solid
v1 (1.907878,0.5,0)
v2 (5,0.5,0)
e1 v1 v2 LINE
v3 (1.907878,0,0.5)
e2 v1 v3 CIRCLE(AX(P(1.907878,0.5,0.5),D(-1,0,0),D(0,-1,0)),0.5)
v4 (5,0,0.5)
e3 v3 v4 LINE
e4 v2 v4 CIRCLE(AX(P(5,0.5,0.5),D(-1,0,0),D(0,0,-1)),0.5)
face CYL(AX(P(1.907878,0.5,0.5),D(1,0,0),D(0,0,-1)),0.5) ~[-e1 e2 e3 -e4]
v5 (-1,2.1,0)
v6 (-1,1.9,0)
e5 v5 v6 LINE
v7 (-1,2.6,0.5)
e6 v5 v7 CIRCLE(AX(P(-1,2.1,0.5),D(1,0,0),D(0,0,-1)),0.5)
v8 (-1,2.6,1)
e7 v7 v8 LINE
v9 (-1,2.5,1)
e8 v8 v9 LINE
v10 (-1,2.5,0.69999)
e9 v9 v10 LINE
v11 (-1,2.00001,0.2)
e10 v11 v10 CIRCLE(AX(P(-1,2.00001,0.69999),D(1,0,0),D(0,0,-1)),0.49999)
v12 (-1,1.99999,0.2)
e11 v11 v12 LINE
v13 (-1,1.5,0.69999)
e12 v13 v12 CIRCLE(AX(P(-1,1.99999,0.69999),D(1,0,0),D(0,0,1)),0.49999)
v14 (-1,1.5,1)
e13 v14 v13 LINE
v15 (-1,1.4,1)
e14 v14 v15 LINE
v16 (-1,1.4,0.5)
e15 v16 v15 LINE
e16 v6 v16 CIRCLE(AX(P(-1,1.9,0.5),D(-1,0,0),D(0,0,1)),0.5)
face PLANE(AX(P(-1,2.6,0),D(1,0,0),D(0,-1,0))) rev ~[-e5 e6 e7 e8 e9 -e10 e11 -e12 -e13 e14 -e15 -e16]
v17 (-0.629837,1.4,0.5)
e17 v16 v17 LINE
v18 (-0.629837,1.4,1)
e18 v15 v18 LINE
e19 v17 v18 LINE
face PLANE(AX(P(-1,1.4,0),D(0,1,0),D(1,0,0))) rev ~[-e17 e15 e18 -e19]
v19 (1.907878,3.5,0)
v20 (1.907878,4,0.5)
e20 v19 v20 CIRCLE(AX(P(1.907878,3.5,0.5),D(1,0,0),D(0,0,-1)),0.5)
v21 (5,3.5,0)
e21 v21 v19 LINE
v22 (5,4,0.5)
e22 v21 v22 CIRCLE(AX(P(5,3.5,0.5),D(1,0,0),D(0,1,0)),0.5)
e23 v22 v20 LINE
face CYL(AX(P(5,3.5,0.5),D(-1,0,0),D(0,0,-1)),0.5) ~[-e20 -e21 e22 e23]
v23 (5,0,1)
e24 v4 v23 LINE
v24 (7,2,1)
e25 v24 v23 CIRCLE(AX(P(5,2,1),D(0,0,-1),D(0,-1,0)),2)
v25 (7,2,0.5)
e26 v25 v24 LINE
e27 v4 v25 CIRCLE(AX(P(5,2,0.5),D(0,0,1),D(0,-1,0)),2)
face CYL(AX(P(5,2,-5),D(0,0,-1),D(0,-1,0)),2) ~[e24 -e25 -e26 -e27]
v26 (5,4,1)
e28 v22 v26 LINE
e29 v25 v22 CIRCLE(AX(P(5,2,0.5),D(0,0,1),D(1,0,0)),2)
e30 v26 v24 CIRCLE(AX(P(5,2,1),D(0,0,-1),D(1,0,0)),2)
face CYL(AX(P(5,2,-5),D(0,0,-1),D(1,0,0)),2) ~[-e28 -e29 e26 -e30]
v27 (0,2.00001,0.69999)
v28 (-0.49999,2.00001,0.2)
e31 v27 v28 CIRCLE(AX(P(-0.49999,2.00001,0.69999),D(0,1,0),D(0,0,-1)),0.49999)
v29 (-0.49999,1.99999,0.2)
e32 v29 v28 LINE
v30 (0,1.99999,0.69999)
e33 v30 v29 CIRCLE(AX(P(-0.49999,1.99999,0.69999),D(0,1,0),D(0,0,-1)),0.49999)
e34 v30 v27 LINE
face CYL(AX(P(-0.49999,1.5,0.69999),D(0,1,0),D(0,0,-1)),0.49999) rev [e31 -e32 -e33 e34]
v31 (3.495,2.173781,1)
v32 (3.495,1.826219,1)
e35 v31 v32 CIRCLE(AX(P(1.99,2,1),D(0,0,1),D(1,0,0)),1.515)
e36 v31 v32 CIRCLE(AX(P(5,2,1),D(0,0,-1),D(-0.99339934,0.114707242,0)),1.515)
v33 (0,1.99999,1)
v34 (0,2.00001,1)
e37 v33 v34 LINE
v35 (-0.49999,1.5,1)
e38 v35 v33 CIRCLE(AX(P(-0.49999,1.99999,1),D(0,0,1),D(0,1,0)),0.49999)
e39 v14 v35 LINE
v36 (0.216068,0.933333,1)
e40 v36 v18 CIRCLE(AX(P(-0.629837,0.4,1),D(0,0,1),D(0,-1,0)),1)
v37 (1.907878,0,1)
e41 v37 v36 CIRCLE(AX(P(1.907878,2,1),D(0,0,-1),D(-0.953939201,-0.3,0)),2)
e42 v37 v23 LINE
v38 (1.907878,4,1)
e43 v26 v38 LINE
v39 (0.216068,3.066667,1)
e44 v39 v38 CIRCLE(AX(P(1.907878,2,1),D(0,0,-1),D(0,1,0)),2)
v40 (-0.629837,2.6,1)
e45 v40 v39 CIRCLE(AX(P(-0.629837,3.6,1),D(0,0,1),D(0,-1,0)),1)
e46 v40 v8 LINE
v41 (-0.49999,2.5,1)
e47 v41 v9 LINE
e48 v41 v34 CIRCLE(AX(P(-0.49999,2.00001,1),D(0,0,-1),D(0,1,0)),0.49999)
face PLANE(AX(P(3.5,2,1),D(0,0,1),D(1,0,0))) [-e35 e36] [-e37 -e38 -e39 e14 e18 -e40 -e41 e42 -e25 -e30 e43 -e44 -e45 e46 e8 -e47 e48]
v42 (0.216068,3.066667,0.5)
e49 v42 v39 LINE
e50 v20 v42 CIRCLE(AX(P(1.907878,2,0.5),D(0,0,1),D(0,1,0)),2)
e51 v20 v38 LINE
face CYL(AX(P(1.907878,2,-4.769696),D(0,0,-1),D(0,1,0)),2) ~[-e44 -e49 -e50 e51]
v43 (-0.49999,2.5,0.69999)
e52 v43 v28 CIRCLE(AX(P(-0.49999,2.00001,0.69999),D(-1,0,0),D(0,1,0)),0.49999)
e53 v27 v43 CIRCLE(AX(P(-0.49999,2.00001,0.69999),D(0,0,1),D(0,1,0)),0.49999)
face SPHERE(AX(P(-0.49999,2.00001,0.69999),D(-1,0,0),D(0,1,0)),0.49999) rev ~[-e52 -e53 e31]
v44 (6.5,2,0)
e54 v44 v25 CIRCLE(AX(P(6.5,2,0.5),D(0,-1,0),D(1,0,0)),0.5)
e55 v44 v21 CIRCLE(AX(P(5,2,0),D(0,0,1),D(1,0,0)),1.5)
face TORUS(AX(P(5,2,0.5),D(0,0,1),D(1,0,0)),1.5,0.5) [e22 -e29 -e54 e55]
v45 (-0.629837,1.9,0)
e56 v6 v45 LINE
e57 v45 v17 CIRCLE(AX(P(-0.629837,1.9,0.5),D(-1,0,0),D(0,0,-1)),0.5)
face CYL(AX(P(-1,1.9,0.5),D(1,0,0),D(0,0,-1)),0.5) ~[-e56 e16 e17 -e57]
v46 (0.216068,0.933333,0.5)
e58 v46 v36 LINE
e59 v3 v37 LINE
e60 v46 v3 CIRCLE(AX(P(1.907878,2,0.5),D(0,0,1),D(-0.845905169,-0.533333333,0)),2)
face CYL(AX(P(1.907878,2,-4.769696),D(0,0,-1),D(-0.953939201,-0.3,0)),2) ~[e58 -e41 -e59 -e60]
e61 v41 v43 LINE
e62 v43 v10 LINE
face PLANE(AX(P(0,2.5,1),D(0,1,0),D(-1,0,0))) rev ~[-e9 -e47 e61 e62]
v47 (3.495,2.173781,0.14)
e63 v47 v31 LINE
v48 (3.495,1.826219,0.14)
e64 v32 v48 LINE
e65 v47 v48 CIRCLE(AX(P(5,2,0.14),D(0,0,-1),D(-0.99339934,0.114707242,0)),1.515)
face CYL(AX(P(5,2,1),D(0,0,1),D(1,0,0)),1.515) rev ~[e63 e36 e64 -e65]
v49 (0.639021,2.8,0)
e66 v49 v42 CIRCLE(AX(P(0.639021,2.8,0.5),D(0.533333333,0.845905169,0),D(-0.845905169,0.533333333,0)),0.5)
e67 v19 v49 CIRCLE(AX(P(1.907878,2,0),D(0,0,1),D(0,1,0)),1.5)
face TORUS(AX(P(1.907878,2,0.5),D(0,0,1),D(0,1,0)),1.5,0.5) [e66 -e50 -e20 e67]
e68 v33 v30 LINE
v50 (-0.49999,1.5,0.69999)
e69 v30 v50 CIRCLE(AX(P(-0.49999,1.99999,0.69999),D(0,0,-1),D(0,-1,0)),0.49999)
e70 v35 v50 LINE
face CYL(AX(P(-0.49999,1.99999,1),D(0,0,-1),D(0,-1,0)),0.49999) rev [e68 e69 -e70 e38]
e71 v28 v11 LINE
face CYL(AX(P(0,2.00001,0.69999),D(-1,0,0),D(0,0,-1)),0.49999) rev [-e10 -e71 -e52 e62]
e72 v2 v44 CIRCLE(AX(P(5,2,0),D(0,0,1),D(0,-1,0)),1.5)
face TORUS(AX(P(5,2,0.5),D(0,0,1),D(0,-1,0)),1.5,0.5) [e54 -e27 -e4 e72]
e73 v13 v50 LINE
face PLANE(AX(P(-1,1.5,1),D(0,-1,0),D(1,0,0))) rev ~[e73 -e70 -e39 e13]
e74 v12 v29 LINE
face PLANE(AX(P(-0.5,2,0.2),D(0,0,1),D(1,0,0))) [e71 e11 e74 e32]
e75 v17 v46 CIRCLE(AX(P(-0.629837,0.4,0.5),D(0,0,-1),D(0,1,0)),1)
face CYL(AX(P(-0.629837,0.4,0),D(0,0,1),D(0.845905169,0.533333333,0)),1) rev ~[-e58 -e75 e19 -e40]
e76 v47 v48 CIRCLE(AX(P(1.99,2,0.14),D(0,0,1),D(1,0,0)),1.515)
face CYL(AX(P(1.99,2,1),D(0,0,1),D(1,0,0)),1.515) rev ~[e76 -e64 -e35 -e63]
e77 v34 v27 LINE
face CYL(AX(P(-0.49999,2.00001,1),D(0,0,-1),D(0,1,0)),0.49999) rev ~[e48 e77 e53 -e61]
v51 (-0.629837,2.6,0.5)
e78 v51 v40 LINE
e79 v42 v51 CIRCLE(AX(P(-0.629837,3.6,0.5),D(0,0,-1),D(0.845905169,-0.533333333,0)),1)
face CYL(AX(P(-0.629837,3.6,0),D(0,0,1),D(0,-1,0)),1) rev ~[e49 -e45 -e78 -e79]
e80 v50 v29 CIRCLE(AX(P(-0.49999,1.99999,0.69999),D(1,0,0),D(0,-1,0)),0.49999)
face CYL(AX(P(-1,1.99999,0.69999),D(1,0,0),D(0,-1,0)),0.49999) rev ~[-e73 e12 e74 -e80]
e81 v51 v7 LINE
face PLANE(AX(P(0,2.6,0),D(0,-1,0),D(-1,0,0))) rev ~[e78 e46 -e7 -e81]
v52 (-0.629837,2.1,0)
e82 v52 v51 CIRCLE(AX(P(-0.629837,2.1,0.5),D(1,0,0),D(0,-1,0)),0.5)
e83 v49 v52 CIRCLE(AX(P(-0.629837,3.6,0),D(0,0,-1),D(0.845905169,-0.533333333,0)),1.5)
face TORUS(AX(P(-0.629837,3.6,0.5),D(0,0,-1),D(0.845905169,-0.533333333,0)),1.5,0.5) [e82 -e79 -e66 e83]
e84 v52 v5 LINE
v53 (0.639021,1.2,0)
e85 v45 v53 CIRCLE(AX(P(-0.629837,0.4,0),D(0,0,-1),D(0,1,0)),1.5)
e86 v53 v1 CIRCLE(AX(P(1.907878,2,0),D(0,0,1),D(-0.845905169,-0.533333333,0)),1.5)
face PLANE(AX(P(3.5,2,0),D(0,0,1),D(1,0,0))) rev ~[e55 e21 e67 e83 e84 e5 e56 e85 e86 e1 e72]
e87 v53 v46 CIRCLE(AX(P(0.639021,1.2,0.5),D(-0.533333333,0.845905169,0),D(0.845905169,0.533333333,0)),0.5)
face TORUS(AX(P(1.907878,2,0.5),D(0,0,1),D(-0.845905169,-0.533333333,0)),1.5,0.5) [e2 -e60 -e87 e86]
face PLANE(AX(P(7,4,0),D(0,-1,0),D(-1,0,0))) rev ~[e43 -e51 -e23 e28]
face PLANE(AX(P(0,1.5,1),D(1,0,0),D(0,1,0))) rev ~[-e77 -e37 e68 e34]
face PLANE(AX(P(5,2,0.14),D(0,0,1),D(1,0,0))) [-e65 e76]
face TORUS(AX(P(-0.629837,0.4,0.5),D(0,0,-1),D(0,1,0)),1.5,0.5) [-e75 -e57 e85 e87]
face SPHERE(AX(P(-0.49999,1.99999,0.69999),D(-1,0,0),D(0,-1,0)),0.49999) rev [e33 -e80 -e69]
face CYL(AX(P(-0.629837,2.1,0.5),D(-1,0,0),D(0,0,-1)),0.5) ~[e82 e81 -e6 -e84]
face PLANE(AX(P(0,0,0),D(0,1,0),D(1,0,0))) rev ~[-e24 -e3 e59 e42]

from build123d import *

# Parameters (mm, degrees)
F1_DEPTH    = 1
F2_R        = 1.515
F3_DEPTH    = 0.86
F4_R        = 1.515
F5_DEPTH    = 0.86
F6_DEPTH    = 0.6
F8_DEPTH    = 0.8
F9_T1_DEPTH = 10.5393920142
F9_T3_DEPTH = 11
F10_R       = 1
F11_R       = 0.49999
F12_R       = 0.5


# Not quite as in the source:
# - a fillet or chamfer that OpenCascade refuses, or shapes differently, is made with other operations: its cross-section is extruded or revolved along the edge and cut away or added
# - a fillet or chamfer is up to 0.001 mm smaller than in the source, because OpenCascade refuses the exact size


with BuildPart() as f1:
    # F0 (on Top) → F1 (new body)
    with BuildSketch(Plane.XY):
        Polygon((0, 1.4), (0, 0), (7, 0), (7, 4), (0, 4), (0, 2.6), (0, 2), align=None)
        Polygon((-1, 1.4), (0, 1.4), (0, 2), (0, 2.6), (-1, 2.6), align=None)
    extrude(amount=F1_DEPTH)

    # F2 (on face) → F3 (cut)
    with BuildSketch(Plane.XY.offset(1)):
        with Locations((5, 2)):
            Circle(F2_R)
    extrude(amount=-F3_DEPTH, mode=Mode.SUBTRACT)

    # F4 (on face) → F5 (cut)
    with BuildSketch(Plane.XY.offset(1)):
        with Locations((1.99, 2)):
            Circle(F4_R)
    extrude(amount=-F5_DEPTH, mode=Mode.SUBTRACT)

    # F4 (on face) → F6 (cut)
    with BuildSketch(Plane.XY.offset(1)):
        with Locations((1.99, 2)):
            Circle(F4_R)
    extrude(amount=-F6_DEPTH, mode=Mode.SUBTRACT)

    # F7 (on face) → F8 (cut)
    with BuildSketch(Plane.XY.offset(1)):
        Polygon((-1, 2.5), (-1, 2), (-1, 1.5), (0, 1.5), (0, 2.5), align=None)
    extrude(amount=-F8_DEPTH, mode=Mode.SUBTRACT)

    # F9: fillet of radius 2 on 4 edges, made by hand

    # F9_s2 → F9_t1 (cut)
    with BuildSketch(Plane.XY.offset(-4.7696960071)):
        with BuildLine():
            ThreePointArc((1.9078784028, 4), (0.7246624462, 3.6124515497), (0, 2.6))
            Line((0, 2.6), (-0.0381575681, 2.612))
            ThreePointArc((-0.0381575681, 2.612), (-0.04, 3.3), (-0.04, 4))
            Line((-0.04, 4), (0, 4.04))
            Line((0, 4.04), (1.9078784028, 4.04))
            Line((1.9078784028, 4.04), (1.9078784028, 4))
        make_face()
        with BuildLine():
            ThreePointArc((0, 1.4), (0.7246624462, 0.3875484503), (1.9078784028, 0))
            Line((1.9078784028, 0), (1.9078784028, -0.04))
            Line((1.9078784028, -0.04), (0, -0.04))
            Line((0, -0.04), (-0.04, 0))
            ThreePointArc((-0.04, 0), (-0.04, 0.7), (-0.0381575681, 1.388))
            Line((-0.0381575681, 1.388), (0, 1.4))
        make_face()
    extrude(amount=F9_T1_DEPTH, mode=Mode.SUBTRACT)

    # F9_s4 → F9_t3 (cut)
    with BuildSketch(Plane.XY.offset(-5)):
        with BuildLine():
            ThreePointArc((7, 2), (6.4142135624, 3.4142135624), (5, 4))
            Line((5, 4), (5, 4.04))
            Line((5, 4.04), (7.04, 4.04))
            Line((7.04, 4.04), (7.04, 2))
            Line((7.04, 2), (7, 2))
        make_face()
        with BuildLine():
            ThreePointArc((5, 0), (6.4142135624, 0.5857864376), (7, 2))
            Line((7, 2), (7.04, 2))
            Line((7.04, 2), (7.04, -0.04))
            Line((7.04, -0.04), (5, -0.04))
            Line((5, -0.04), (5, 0))
        make_face()
    extrude(amount=F9_T3_DEPTH, mode=Mode.SUBTRACT)

    # F10
    f10_edges = [f1.edges().sort_by_distance(p)[0] for p in [
        (0, 1.4, 0.5),
        (0, 2.6, 0.5),
    ]]
    fillet(f10_edges, radius=F10_R)

    # F11 (radius 0.5 in the source; OpenCascade refuses exactly that, so slightly less here)
    f11_edges = [f1.edges().sort_by_distance(p)[0] for p in [
        (-0.5, 2.5, 0.2),
        (-0.5, 1.5, 0.2),
        (0, 1.5, 0.6),
        (0, 2.5, 0.6),
        (0, 2, 0.2),
    ]]
    fillet(f11_edges, radius=F11_R)

    # F12
    f12_edges = [f1.edges().sort_by_distance(p)[0] for p in [
        (3.453939, 0, 0),
        (6.414214, 0.585786, 0),
    ]]
    fillet(f12_edges, radius=F12_R)


solid = f1.part
